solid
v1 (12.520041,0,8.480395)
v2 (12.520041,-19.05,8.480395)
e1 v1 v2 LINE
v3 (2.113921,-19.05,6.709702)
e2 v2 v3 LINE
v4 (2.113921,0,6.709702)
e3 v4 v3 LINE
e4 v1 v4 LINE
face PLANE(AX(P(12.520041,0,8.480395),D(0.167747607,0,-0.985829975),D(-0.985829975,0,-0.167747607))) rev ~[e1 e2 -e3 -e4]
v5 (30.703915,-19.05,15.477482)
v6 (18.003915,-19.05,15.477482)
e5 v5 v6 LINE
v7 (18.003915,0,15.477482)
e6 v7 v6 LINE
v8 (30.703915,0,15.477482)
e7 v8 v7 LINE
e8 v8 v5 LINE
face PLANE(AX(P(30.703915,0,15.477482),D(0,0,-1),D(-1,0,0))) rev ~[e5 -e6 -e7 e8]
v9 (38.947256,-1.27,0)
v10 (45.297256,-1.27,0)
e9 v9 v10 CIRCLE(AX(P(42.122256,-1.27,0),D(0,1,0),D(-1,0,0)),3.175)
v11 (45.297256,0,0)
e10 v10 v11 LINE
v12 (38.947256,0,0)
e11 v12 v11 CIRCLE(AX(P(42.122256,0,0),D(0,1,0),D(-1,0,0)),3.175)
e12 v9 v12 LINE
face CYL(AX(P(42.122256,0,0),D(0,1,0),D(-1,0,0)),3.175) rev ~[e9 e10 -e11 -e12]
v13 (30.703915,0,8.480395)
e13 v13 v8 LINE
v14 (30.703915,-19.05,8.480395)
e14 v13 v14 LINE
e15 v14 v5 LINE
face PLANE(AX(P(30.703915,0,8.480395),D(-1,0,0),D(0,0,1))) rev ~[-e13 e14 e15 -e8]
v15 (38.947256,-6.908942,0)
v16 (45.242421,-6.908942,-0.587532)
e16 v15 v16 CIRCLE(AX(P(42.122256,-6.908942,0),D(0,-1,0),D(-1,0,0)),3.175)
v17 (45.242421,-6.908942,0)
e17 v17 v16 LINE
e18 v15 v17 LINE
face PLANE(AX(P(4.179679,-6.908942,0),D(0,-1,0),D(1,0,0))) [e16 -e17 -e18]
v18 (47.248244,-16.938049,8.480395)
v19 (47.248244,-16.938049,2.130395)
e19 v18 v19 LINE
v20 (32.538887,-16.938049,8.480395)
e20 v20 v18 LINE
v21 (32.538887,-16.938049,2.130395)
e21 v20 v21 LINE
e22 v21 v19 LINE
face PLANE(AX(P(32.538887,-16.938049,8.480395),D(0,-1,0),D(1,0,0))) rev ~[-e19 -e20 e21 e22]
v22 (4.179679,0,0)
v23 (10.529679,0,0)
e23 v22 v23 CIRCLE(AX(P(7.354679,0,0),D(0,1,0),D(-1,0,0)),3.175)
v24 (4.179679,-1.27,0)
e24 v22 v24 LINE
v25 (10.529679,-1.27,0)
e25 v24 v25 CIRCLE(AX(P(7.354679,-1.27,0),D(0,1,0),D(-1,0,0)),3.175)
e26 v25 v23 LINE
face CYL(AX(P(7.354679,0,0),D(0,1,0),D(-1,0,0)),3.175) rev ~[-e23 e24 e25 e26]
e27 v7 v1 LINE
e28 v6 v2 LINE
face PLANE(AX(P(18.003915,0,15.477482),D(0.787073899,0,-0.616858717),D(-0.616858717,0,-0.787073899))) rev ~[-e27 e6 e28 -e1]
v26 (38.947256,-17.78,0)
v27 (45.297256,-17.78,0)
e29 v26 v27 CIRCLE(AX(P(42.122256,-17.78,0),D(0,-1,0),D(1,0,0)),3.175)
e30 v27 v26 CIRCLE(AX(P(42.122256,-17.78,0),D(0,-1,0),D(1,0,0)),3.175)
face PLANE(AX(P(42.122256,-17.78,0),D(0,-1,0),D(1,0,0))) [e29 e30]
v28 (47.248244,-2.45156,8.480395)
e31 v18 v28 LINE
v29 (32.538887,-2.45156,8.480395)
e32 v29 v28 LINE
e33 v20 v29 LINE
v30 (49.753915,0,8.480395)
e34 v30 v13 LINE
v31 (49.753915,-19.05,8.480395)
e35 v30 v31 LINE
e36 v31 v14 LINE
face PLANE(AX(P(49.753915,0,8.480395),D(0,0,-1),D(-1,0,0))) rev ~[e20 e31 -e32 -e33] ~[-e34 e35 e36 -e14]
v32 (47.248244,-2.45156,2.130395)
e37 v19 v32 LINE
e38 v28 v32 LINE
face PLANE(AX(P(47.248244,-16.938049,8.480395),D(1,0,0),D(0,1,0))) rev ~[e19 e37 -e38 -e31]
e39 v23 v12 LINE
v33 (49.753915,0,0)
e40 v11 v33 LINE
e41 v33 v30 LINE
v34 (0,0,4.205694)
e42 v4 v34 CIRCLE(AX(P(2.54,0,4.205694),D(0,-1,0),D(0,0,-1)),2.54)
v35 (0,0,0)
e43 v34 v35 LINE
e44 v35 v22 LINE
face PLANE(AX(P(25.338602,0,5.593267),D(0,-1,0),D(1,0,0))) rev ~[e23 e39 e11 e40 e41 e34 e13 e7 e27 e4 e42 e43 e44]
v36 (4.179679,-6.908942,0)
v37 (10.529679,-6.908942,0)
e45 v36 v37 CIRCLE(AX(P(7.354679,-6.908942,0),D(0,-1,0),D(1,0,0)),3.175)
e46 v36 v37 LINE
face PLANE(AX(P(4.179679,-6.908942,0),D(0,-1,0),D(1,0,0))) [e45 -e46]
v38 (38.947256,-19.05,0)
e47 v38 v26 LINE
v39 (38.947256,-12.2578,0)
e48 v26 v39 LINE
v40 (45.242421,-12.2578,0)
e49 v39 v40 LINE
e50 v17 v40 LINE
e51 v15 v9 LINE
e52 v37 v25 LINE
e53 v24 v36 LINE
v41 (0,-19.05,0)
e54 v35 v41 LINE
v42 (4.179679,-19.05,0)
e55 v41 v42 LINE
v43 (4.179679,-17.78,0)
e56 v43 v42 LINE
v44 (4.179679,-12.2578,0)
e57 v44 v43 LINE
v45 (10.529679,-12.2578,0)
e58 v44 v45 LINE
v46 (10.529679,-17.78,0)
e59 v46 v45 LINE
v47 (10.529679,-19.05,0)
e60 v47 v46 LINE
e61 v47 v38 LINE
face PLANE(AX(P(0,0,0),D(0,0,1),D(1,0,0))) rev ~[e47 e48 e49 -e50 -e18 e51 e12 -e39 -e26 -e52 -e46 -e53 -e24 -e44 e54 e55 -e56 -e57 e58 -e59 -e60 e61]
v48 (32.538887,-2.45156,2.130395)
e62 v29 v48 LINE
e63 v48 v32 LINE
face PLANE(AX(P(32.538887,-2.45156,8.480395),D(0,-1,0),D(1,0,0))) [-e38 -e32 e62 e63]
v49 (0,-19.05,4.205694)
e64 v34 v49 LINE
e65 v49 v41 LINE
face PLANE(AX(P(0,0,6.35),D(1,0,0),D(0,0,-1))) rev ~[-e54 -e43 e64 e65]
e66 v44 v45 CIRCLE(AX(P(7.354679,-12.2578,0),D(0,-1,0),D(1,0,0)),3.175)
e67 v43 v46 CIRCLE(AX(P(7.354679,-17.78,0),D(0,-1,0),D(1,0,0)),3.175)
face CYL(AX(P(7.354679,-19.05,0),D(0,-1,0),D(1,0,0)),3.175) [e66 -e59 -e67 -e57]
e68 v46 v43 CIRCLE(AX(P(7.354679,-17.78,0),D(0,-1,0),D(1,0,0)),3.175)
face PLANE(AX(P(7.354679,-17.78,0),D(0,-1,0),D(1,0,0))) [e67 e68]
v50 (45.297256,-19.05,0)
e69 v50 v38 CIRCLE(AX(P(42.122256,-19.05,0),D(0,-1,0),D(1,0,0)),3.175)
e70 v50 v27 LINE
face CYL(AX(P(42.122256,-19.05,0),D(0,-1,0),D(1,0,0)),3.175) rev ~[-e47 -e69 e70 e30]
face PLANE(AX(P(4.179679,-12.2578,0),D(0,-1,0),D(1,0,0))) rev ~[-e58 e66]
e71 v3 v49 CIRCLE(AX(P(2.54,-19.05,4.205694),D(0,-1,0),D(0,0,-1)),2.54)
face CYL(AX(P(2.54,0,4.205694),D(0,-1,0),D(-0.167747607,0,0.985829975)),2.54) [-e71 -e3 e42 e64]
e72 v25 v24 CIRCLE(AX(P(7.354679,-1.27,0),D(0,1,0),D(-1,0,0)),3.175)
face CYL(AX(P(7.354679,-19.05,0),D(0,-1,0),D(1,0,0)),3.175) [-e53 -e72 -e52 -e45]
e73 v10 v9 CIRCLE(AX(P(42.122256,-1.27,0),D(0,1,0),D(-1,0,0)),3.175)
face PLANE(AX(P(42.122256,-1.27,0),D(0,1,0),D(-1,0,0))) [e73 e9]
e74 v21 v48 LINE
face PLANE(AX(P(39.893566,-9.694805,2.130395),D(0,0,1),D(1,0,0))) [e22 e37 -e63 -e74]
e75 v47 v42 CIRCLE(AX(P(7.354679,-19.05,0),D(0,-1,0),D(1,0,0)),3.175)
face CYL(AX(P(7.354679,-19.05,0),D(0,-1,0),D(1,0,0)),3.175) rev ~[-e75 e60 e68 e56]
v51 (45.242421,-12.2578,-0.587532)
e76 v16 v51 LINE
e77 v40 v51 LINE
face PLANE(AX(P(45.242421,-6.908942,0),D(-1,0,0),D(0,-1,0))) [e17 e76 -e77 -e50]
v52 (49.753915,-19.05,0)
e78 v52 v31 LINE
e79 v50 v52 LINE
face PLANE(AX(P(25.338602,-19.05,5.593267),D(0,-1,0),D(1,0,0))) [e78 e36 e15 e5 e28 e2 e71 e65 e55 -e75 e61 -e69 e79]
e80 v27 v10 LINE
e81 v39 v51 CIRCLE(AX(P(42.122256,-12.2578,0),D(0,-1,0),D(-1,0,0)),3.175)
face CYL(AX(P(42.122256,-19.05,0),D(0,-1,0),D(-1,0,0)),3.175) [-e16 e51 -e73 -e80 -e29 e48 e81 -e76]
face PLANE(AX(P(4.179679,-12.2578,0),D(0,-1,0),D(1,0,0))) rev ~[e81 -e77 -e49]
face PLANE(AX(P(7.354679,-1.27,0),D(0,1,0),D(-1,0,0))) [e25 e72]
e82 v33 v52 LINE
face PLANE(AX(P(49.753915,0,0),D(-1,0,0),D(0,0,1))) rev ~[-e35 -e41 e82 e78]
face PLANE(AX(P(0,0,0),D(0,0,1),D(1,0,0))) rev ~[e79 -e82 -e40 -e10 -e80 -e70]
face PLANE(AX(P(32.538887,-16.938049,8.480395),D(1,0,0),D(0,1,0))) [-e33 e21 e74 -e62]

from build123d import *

# Parameters (mm, degrees)
F1_DEPTH  = 19.05
F4_DEPTH  = 19.05
F5_R      = 2.54
F9_DEPTH  = 1.27
F11_DEPTH = 1.27
F13_DEPTH = 1.27
F14_W     = 41.0627422772
F14_H     = 5.3488574922
F15_DEPTH = 22.606
F16_W     = 14.7093571723
F16_H     = 14.4864893518
F17_DEPTH = 6.35


# Not quite as in the source:
# - a feature of the source that left no trace in its solid (it failed there, or was rolled back) is left out


with BuildPart() as f1:
    # F0 (on Front) → F1 (new body)
    with BuildSketch(Plane.XZ):
        Polygon((0, 6.35), (0, 0), (49.7539146826, 0), (49.7539146826, 8.4803946126), (30.7039146826, 8.4803946126), (30.7039146826, 15.4774815776), (18.0039146826, 15.4774815776), (12.5200406866, 8.4803946126), align=None)
    extrude(amount=F1_DEPTH)

    # F2 (on face) + F3 (on face) → F4 (join)
    with BuildSketch(Plane.XZ.offset(19.05)):
        with BuildLine():
            ThreePointArc((4.1796790518, 0), (7.3546790518, -3.175), (10.5296790518, 0))
            Line((10.5296790518, 0), (4.1796790518, 0))
        make_face()
        with BuildLine():
            Line((4.1796790518, 0), (10.5296790518, 0))
            ThreePointArc((10.5296790518, 0), (7.3546790518, 3.175), (4.1796790518, 0))
        make_face()
    with BuildSketch(Plane.XZ.offset(19.05)):
        with BuildLine():
            ThreePointArc((38.9472560108, 0), (42.1222560108, -3.175), (45.2972560108, 0))
            Line((45.2972560108, 0), (38.9472560108, 0))
        make_face()
    extrude(amount=-F4_DEPTH)

    # F5
    f5_edges = [f1.edges().sort_by_distance(p)[0] for p in [
        (0, -9.525, 6.35),
    ]]
    fillet(f5_edges, radius=F5_R)

    # F8 (on face) → F9 (cut)
    with BuildSketch(Plane(origin=(0, 0, 0), x_dir=(-1, 0, 0), z_dir=(0, 1, 0))):
        with BuildLine():
            ThreePointArc((-10.5296790518, 0), (-7.3546790518, -3.175), (-4.1796790518, 0))
            ThreePointArc((-4.1796790518, 0), (-7.3546790518, 3.175), (-10.5296790518, 0))
        make_face()
    extrude(amount=-F9_DEPTH, mode=Mode.SUBTRACT)

    # F10 (on face) → F11 (cut)
    with BuildSketch(Plane(origin=(0, 0, 0), x_dir=(-1, 0, 0), z_dir=(0, 1, 0))):
        with BuildLine():
            ThreePointArc((-45.2972560108, 0), (-42.1222560108, -3.175), (-38.9472560108, 0))
            ThreePointArc((-38.9472560108, 0), (-42.1222560108, 3.175), (-45.2972560108, 0))
        make_face()
    extrude(amount=-F11_DEPTH, mode=Mode.SUBTRACT)

    # F12 (on face) → F13 (cut)
    with BuildSketch(Plane.XZ.offset(19.05)):
        with BuildLine():
            ThreePointArc((38.9472560108, 0), (42.1222560108, -3.175), (45.2972560108, 0))
            ThreePointArc((45.2972560108, 0), (42.1222560108, 3.175), (38.9472560108, 0))
        make_face()
        with BuildLine():
            ThreePointArc((4.1796790518, 0), (7.3546790518, -3.175), (10.5296790518, 0))
            ThreePointArc((10.5296790518, 0), (7.3546790518, 3.175), (4.1796790518, 0))
        make_face()
    extrude(amount=-F13_DEPTH, mode=Mode.SUBTRACT)

    # F14 (on face) → F15 (cut)
    with BuildSketch(Plane(origin=(0, 0, 0), x_dir=(1, 0, 0), z_dir=(0, 0, -1))):
        with Locations((24.7110501904, 9.5833707601)):
            Rectangle(F14_W, F14_H)
    extrude(amount=F15_DEPTH, mode=Mode.SUBTRACT)

    # F16 (on face) → F17 (cut)
    with BuildSketch(Plane.XY.offset(8.4803946126)):
        with Locations((39.8935656995, -9.6948046703)):
            Rectangle(F16_W, F16_H)
    extrude(amount=-F17_DEPTH, mode=Mode.SUBTRACT)


solid = f1.part
